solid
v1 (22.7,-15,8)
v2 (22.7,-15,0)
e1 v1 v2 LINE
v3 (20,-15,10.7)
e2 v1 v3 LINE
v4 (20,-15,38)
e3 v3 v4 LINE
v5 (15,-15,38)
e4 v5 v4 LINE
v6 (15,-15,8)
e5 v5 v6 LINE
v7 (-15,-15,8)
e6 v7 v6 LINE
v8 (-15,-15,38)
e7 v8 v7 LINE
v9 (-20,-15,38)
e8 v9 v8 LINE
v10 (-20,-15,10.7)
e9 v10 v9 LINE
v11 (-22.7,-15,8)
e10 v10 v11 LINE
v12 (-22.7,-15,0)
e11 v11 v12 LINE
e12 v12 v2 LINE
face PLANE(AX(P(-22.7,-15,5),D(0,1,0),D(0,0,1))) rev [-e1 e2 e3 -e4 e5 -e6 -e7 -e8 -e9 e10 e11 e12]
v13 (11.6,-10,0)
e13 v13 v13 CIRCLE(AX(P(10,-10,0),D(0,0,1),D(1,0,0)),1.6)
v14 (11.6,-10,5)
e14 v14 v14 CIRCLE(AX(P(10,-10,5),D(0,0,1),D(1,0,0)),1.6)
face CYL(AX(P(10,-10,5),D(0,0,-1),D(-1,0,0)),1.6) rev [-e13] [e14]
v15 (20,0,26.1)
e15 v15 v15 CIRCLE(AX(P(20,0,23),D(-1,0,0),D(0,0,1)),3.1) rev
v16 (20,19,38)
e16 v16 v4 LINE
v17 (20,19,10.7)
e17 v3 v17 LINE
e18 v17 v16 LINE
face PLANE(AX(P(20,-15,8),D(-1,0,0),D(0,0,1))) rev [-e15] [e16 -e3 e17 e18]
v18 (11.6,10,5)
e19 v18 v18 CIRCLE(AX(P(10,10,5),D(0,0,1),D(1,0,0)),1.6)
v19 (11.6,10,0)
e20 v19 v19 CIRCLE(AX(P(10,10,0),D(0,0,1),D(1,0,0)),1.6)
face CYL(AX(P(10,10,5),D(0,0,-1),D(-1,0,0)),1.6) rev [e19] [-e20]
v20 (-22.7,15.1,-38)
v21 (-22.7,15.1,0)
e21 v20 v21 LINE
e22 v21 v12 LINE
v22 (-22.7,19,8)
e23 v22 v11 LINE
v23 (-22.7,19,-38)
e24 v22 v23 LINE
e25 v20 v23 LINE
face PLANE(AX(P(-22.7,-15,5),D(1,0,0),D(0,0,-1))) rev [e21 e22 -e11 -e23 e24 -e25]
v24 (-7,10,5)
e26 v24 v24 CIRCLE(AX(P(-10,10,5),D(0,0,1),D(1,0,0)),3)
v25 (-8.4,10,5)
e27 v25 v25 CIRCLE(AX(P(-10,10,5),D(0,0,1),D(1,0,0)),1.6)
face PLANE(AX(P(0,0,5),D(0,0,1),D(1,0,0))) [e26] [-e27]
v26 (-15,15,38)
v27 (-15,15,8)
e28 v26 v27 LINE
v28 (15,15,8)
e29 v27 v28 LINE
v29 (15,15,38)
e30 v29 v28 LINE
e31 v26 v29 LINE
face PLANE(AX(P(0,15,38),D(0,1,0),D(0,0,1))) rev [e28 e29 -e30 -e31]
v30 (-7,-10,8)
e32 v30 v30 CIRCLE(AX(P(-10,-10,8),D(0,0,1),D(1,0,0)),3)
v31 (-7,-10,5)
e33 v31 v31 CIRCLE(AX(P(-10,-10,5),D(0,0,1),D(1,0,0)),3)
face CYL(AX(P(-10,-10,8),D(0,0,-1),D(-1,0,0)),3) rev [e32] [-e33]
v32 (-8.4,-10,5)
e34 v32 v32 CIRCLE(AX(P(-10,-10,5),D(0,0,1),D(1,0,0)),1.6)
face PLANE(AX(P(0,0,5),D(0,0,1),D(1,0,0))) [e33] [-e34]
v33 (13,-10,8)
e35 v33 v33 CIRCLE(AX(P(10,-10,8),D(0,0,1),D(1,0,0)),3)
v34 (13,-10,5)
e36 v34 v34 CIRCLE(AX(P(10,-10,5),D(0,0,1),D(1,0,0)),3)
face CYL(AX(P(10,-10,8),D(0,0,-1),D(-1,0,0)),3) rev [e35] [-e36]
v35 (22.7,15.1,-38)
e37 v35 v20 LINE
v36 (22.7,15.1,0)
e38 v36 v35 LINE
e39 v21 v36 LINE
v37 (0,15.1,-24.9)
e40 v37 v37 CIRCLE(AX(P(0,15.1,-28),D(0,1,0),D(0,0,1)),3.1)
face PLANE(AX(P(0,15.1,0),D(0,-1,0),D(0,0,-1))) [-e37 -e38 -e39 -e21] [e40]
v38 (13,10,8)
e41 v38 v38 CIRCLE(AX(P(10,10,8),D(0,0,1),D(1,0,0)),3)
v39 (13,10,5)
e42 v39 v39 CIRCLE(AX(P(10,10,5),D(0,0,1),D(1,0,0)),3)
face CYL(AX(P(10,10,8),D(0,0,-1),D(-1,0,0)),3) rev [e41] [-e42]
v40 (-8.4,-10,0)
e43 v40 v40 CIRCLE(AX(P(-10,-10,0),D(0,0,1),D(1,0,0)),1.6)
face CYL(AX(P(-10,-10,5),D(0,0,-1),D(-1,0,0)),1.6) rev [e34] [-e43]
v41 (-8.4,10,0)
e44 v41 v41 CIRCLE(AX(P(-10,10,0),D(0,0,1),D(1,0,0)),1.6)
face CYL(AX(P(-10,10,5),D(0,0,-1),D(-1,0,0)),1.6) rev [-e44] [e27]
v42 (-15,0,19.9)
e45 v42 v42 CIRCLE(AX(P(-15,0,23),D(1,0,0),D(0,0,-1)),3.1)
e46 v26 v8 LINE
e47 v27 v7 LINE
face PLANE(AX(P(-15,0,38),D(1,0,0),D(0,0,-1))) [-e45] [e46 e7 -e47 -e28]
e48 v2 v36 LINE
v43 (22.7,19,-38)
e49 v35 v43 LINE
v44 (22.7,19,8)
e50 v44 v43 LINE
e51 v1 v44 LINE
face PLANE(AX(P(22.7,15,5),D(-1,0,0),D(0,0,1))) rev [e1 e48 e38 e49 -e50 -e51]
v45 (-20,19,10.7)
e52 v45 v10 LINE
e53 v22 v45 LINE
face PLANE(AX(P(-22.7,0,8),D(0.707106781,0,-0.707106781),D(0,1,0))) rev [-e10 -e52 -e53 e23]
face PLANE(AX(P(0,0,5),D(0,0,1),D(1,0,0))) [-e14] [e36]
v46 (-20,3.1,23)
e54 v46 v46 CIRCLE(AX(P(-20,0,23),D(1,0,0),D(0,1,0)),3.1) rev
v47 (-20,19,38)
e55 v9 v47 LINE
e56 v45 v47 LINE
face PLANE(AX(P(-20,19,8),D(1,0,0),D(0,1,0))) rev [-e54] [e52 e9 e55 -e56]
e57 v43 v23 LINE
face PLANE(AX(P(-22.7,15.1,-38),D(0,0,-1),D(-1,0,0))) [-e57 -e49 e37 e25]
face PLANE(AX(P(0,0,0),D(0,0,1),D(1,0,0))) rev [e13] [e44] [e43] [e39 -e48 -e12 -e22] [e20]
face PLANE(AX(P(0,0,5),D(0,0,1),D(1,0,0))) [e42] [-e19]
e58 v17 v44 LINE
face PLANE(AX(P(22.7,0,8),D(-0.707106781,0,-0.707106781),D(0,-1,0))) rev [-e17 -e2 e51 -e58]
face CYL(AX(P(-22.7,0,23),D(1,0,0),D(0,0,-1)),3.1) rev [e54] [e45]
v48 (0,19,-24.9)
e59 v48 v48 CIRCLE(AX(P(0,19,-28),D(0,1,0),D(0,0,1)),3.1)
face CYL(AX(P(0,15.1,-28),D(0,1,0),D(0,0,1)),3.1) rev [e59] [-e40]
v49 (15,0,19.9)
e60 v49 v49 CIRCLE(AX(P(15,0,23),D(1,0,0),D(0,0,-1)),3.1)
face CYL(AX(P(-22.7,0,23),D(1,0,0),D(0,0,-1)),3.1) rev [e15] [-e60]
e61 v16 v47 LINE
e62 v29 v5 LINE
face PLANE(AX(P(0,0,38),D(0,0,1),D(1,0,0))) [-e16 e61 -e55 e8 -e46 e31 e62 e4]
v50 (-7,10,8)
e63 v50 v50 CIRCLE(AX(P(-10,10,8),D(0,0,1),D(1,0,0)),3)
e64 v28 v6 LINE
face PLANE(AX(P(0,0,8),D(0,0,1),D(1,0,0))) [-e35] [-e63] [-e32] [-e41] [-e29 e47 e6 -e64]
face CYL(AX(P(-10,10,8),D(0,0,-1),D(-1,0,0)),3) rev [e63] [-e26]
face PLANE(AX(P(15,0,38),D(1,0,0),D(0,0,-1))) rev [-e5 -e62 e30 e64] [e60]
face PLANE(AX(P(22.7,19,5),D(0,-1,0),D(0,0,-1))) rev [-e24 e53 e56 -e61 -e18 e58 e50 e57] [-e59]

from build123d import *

# Parameters (mm, degrees)
SKETCH1_R           = 1.6
BOSS_EXTRUDE1_DEPTH = 5
SKETCH3_W           = 45.4
SKETCH3_H           = 34
SKETCH3_R           = 3
BOSS_EXTRUDE2_DEPTH = 3
BOSS_EXTRUDE3_DEPTH = 30
SKETCH5_R           = 3.1
CUT_EXTRUDE2_DEPTH  = 63.178452859
SKETCH6_W           = 45.4
SKETCH6_H           = 38
SKETCH6_R           = 3.1
BOSS_EXTRUDE4_DEPTH = 3.9
SKETCH9_W           = 2.7
SKETCH9_H           = 34
CUT_EXTRUDE3_DEPTH  = 30
CHAMFER1_SIZE       = 2.7


with BuildPart() as part:
    # Sketch1 → Boss-Extrude1 (new body)
    with BuildSketch(Plane.XY):
        Polygon((22.7, 15), (22.7, 19), (-22.7, 19), (-22.7, 15), (-22.7, -15), (22.7, -15), align=None)
        with Locations((-10, 10)):
            Circle(SKETCH1_R, mode=Mode.SUBTRACT)
        with Locations((10, 10)):
            Circle(SKETCH1_R, mode=Mode.SUBTRACT)
        with Locations((10, -10)):
            Circle(SKETCH1_R, mode=Mode.SUBTRACT)
        with Locations((-10, -10)):
            Circle(SKETCH1_R, mode=Mode.SUBTRACT)
    extrude(amount=BOSS_EXTRUDE1_DEPTH)

    # Sketch3 → Boss-Extrude2 (add)
    with BuildSketch(Plane.XY.offset(5)):
        with Locations((0, 2)):
            Rectangle(SKETCH3_W, SKETCH3_H)
        with Locations((10, -10)):
            Circle(SKETCH3_R, mode=Mode.SUBTRACT)
        with Locations((10, 10)):
            Circle(SKETCH3_R, mode=Mode.SUBTRACT)
        with Locations((-10, 10)):
            Circle(SKETCH3_R, mode=Mode.SUBTRACT)
        with Locations((-10, -10)):
            Circle(SKETCH3_R, mode=Mode.SUBTRACT)
    extrude(amount=BOSS_EXTRUDE2_DEPTH)

    # Sketch2 → Boss-Extrude3 (add)
    with BuildSketch(Plane.XY.offset(8)):
        Polygon((15, 15), (15, -15), (22.7, -15), (22.7, 19), (-22.7, 19), (-22.7, -15), (-15, -15), (-15, 15), align=None)
    extrude(amount=BOSS_EXTRUDE3_DEPTH)

    # Sketch5 → Cut-Extrude2 (cut, through all)
    with BuildSketch(Plane(origin=(22.7, 0, 0), x_dir=(0, 0, -1), z_dir=(1, 0, 0))):
        with Locations((-23, 0)):
            Circle(SKETCH5_R)
    extrude(amount=-CUT_EXTRUDE2_DEPTH, mode=Mode.SUBTRACT)

    # Sketch6 → Boss-Extrude4 (add)
    with BuildSketch(Plane(origin=(0, 19, 0), x_dir=(1, 0, 0), z_dir=(0, 1, 0))):
        with Locations((0, 19)):
            Rectangle(SKETCH6_W, SKETCH6_H)
        with Locations(Location((0, 28, 0), (0, 0, 270))):
            Circle(SKETCH6_R, mode=Mode.SUBTRACT)
    extrude(amount=-BOSS_EXTRUDE4_DEPTH)

    # Sketch9 → Cut-Extrude3 (cut)
    with BuildSketch(Plane.XY.offset(38)):
        with Locations((-21.35, 2)):
            Rectangle(SKETCH9_W, SKETCH9_H)
        with Locations((21.35, 2)):
            Rectangle(SKETCH9_W, SKETCH9_H)
    extrude(amount=-CUT_EXTRUDE3_DEPTH, mode=Mode.SUBTRACT)

    # Chamfer1
    chamfer1_edges = [part.edges().sort_by_distance(p)[0] for p in [
        (20, 2, 8),
        (-20, 2, 8),
    ]]
    chamfer(chamfer1_edges, length=CHAMFER1_SIZE - 0.0001)  # a hair under: the kernel refuses the full size


solid = part.part
